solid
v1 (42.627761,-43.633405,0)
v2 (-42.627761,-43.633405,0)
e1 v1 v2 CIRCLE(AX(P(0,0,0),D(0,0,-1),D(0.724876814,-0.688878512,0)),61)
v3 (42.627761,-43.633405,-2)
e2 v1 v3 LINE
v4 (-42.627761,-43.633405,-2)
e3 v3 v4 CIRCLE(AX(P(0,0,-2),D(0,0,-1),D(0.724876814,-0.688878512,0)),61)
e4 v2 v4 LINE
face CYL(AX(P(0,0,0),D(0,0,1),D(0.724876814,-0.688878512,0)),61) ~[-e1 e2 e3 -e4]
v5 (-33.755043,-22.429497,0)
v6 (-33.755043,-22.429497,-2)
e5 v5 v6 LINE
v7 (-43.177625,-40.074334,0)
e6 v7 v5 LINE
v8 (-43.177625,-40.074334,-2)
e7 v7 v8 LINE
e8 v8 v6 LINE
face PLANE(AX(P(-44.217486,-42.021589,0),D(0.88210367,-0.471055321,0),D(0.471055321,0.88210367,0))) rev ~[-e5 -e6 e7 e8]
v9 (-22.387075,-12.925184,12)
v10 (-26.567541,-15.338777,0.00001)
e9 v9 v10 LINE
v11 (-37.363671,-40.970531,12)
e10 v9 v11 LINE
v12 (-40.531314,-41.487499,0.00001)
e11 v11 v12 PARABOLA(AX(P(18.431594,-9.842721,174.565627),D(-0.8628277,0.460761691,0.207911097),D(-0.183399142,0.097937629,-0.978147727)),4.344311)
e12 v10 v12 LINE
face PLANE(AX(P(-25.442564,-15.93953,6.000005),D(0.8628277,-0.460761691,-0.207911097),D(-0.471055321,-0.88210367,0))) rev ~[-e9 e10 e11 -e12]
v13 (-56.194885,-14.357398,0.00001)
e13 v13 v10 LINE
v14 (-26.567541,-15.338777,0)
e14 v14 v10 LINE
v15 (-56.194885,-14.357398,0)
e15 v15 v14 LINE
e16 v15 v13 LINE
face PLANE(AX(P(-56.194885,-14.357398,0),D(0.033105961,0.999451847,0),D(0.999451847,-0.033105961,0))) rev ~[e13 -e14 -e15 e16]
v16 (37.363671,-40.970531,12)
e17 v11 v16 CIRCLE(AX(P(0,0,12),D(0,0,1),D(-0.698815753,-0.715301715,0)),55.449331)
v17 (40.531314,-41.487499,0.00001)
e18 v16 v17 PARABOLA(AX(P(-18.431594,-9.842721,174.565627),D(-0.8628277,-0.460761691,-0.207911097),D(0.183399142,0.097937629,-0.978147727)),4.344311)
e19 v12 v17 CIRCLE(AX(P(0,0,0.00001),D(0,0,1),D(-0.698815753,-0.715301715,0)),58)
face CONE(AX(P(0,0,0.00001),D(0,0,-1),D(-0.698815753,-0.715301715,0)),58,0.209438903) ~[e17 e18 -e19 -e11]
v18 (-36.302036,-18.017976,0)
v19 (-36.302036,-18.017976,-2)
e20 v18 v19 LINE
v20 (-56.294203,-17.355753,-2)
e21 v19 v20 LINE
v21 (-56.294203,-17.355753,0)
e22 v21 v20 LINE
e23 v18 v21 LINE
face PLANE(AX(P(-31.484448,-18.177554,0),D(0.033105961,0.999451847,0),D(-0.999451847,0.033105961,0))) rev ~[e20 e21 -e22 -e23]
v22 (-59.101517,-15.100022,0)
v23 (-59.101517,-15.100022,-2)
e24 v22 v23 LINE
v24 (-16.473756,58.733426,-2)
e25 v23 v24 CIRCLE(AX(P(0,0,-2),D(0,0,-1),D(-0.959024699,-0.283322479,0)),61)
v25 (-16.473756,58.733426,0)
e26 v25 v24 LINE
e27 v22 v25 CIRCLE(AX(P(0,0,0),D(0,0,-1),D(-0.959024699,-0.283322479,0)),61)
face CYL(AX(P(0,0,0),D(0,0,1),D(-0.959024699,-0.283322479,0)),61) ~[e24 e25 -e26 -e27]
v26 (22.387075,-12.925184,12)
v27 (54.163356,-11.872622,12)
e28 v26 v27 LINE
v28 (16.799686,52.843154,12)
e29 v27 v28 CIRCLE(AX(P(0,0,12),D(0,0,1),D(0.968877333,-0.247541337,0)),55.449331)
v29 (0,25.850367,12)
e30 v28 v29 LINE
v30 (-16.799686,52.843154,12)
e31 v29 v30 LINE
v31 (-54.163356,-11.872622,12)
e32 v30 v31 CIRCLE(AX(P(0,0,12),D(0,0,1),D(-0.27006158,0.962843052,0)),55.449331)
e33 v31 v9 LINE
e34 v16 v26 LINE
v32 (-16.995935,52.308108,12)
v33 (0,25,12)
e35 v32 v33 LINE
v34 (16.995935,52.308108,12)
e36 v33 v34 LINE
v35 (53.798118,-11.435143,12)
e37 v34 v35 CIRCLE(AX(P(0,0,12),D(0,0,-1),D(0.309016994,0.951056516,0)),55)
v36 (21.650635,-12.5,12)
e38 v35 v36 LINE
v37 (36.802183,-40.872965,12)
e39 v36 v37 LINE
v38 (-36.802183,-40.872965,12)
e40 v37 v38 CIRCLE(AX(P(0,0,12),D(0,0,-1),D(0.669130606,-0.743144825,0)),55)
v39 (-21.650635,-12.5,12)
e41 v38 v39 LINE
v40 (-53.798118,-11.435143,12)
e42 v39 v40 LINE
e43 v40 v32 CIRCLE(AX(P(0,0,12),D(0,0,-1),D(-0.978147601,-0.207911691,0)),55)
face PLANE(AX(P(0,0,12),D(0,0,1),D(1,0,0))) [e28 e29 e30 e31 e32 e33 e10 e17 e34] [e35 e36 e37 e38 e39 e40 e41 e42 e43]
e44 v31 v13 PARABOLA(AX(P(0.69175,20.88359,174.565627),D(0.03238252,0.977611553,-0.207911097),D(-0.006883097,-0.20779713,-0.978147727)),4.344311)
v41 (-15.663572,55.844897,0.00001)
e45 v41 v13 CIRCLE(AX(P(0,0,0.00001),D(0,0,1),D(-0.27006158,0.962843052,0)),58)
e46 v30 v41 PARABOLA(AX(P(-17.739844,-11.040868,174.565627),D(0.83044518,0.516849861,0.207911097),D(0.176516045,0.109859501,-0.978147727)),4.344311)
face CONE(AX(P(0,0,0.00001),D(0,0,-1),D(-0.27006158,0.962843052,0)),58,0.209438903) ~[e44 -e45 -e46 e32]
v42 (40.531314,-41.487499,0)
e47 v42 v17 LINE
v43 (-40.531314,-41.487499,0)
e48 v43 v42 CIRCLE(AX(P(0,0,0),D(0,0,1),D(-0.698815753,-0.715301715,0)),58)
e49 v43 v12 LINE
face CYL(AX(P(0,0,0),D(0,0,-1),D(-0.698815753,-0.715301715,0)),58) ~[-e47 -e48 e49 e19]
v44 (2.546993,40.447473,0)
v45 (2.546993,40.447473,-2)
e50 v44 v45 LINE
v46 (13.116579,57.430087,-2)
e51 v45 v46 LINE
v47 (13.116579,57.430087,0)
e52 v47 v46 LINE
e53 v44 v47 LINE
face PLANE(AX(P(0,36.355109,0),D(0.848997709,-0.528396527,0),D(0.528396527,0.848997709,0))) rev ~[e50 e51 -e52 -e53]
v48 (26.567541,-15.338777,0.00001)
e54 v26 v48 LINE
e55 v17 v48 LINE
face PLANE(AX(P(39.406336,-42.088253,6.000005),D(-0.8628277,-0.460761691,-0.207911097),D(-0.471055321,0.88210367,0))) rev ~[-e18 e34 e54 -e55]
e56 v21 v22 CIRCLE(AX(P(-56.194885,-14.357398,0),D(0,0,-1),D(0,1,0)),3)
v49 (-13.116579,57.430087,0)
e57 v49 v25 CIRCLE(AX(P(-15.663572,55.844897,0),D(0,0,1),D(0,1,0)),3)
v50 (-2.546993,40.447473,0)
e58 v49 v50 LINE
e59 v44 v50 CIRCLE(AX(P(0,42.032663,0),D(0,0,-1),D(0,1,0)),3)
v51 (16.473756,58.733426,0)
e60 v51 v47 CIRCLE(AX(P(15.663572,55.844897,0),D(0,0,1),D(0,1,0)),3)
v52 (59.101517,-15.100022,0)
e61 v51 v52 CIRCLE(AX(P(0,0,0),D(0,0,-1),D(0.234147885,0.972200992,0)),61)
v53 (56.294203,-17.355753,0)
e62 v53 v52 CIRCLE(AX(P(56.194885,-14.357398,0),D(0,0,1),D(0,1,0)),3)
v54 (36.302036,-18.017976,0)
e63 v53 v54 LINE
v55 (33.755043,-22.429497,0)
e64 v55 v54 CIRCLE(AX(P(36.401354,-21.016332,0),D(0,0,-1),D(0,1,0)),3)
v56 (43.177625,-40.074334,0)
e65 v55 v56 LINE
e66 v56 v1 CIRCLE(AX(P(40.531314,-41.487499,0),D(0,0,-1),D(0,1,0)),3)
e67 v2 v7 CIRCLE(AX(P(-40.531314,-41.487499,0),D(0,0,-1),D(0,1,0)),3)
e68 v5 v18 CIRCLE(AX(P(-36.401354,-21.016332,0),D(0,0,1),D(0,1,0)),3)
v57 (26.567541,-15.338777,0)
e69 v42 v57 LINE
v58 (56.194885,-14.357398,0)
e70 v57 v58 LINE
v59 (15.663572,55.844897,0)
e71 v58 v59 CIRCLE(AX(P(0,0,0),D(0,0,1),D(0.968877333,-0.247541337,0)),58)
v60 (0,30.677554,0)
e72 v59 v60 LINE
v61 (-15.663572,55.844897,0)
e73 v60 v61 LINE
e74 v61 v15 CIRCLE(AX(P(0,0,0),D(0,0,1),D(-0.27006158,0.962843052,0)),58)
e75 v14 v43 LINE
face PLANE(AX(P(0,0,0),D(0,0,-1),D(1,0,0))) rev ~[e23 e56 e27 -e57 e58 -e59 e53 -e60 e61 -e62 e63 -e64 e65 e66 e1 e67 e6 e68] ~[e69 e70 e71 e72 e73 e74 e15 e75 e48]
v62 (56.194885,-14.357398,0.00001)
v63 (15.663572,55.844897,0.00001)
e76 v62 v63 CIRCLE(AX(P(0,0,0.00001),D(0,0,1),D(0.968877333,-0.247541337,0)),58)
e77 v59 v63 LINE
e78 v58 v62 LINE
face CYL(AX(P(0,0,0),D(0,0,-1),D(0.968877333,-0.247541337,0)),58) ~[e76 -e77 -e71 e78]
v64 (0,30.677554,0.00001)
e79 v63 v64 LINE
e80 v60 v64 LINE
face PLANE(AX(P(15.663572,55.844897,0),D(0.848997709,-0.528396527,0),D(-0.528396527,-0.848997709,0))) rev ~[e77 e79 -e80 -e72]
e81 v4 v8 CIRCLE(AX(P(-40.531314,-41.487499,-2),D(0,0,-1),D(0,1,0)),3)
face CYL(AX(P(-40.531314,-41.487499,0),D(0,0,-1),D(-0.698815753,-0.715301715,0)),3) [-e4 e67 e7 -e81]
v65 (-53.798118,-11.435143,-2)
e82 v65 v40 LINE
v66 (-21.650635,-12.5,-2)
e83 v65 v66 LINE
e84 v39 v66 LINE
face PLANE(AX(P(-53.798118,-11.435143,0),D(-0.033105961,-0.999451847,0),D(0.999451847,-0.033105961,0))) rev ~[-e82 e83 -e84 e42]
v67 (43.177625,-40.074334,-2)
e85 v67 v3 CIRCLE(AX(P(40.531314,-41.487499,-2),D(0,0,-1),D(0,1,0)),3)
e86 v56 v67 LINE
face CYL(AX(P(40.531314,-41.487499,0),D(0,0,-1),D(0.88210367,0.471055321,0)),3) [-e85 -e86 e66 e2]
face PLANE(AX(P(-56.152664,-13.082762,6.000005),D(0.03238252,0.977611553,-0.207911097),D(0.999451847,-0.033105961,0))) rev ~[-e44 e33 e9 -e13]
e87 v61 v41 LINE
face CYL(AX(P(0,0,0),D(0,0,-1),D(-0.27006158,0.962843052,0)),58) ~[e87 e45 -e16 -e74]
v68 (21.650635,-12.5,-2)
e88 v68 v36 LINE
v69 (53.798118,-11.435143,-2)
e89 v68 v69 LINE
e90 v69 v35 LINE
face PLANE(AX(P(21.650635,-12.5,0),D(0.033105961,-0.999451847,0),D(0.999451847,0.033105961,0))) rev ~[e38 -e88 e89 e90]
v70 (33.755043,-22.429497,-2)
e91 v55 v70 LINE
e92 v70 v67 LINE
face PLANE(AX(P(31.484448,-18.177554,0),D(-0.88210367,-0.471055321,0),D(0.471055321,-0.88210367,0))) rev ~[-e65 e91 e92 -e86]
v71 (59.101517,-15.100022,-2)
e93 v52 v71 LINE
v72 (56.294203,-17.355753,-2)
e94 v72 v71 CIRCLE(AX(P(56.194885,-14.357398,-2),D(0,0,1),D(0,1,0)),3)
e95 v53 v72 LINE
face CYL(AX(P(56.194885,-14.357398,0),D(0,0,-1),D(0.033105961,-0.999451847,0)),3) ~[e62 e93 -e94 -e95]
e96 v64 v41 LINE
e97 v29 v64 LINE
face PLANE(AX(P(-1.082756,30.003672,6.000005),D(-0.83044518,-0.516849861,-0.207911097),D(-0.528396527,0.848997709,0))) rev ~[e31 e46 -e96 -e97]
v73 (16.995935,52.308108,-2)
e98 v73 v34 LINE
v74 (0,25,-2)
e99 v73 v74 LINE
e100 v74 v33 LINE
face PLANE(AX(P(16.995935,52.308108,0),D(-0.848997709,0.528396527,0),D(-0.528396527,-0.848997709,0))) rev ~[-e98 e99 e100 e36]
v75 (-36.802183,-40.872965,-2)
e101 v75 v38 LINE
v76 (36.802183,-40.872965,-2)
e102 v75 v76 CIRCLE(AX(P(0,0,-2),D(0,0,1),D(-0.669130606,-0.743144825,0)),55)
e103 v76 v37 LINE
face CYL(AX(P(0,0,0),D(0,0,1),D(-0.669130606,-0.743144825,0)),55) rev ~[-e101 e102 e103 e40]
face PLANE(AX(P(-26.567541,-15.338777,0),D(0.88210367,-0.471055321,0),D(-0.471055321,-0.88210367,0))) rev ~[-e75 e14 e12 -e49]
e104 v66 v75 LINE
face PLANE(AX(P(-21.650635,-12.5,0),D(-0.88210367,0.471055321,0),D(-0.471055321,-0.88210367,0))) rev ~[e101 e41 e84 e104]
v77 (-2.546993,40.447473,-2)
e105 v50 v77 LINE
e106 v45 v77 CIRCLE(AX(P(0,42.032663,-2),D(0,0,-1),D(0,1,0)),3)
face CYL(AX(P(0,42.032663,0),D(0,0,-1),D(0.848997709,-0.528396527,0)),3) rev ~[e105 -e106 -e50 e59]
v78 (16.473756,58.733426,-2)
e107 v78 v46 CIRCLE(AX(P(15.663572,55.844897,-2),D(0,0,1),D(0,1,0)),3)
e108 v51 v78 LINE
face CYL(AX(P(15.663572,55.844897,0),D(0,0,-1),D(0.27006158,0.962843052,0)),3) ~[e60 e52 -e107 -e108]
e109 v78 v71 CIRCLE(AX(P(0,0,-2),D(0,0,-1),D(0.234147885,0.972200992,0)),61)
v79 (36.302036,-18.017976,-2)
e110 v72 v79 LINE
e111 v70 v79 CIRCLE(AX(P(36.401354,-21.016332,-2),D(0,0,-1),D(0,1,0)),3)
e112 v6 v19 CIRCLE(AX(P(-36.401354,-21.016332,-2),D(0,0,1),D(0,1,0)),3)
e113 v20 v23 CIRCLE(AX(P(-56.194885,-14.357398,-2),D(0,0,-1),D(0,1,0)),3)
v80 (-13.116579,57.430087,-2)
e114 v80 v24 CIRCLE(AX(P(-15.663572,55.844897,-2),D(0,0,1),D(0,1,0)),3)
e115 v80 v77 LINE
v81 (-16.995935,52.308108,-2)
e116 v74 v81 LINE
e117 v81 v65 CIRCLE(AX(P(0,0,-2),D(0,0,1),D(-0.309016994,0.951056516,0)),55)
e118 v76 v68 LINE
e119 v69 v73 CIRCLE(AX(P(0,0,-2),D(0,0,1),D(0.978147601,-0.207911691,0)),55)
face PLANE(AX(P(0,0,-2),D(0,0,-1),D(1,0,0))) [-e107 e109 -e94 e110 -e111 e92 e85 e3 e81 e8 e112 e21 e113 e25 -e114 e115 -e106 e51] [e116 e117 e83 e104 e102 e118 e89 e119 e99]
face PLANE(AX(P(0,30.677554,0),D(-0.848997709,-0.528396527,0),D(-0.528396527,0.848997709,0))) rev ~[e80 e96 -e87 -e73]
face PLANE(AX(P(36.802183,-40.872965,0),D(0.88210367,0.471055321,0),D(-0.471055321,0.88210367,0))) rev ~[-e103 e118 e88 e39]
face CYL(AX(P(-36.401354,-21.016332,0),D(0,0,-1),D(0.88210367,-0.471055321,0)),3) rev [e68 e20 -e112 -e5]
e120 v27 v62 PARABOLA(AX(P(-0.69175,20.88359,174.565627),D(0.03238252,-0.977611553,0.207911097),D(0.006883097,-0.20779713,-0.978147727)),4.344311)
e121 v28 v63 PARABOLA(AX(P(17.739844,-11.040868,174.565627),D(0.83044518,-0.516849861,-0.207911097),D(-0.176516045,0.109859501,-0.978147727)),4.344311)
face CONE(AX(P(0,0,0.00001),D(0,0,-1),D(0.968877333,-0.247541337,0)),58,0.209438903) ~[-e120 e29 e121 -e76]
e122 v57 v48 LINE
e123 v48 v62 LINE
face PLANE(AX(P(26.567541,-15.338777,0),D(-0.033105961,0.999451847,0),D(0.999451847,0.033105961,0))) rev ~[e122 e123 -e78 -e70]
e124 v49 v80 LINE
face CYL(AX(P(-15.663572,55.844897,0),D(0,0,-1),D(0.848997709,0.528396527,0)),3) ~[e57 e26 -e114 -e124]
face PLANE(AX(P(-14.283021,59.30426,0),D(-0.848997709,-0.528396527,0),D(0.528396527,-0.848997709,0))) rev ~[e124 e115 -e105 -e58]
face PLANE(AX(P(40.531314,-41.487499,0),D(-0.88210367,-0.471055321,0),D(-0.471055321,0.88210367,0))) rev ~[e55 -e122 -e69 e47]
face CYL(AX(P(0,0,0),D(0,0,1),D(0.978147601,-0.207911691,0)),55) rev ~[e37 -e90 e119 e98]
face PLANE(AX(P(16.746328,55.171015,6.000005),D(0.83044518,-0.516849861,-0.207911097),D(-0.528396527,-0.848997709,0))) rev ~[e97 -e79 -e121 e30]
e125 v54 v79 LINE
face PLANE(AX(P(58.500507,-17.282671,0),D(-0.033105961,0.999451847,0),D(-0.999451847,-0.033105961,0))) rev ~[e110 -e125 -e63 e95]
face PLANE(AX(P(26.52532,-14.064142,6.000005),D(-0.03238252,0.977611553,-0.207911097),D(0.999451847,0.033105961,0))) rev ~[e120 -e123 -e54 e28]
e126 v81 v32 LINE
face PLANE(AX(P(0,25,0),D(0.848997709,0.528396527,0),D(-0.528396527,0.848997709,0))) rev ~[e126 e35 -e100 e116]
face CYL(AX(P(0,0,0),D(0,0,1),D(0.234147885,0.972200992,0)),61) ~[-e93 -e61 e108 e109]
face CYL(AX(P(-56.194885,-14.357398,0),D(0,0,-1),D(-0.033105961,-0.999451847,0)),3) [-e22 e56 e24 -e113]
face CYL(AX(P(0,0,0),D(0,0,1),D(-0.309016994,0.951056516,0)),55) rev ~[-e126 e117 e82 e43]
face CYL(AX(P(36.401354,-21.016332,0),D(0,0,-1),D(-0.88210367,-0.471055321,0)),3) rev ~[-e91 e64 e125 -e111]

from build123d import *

# Parameters (mm, degrees)
F1_DEPTH = 12
F3_DEPTH = 2
F4_SIZE2 = 11.99999
F4_SIZE  = 2.550669
F5_R     = 3


# Not quite as in the source:
# - a fillet or chamfer is up to 0.001 mm smaller than in the source, because OpenCascade refuses the exact size


with BuildPart() as f1:
    # F0 (on Top) → F1 (new body)
    with BuildSketch(Plane.XY):
        with BuildLine():
            Line((15.6635716436, 55.8448970217), (0, 30.6775543541))
            Line((0, 30.6775543541), (-15.6635716436, 55.8448970217))
            ThreePointArc((-15.6635716436, 55.8448970217), (-50.2294734195, 29), (-56.1948853143, -14.3573975535))
            Line((-56.1948853143, -14.3573975535), (-26.5675413967, -15.3387771771))
            Line((-26.5675413967, -15.3387771771), (-40.5313136707, -41.4874994682))
            ThreePointArc((-40.5313136707, -41.4874994682), (0, -58), (40.5313136707, -41.4874994682))
            Line((40.5313136707, -41.4874994682), (26.5675413967, -15.3387771771))
            Line((26.5675413967, -15.3387771771), (56.1948853143, -14.3573975535))
            ThreePointArc((56.1948853143, -14.3573975535), (50.2294734195, 29), (15.6635716436, 55.8448970217))
        make_face()
        with BuildLine():
            ThreePointArc((-53.7981180404, -11.435142995), (-47.6313972081, 27.5), (-16.9959346906, 52.3081083962))
            Line((-16.9959346906, 52.3081083962), (0, 25))
            Line((0, 25), (16.9959346906, 52.3081083962))
            ThreePointArc((16.9959346906, 52.3081083962), (47.6313972081, 27.5), (53.7981180404, -11.435142995))
            Line((53.7981180404, -11.435142995), (21.6506350946, -12.5))
            Line((21.6506350946, -12.5), (36.8021833497, -40.8729654013))
            ThreePointArc((36.8021833497, -40.8729654013), (0, -55), (-36.8021833497, -40.8729654013))
            Line((-36.8021833497, -40.8729654013), (-21.6506350946, -12.5))
            Line((-21.6506350946, -12.5), (-53.7981180404, -11.435142995))
        make_face(mode=Mode.SUBTRACT)
    extrude(amount=F1_DEPTH)

    # F2 (on face) → F3 (join)
    with BuildSketch(Plane(origin=(0, 0, 0), x_dir=(1, 0, 0), z_dir=(0, 0, -1))):
        with BuildLine():
            Line((31.4844476987, 18.1775543541), (44.2174856505, 42.0215892459))
            ThreePointArc((44.2174856505, 42.0215892459), (0, 61), (-44.2174856505, 42.0215892459))
            Line((-44.2174856505, 42.0215892459), (-31.4844476987, 18.1775543541))
            Line((-31.4844476987, 18.1775543541), (-58.5005066196, 17.2826712419))
            ThreePointArc((-58.5005066196, 17.2826712419), (-52.8275496309, -30.5), (-14.2830209691, -59.3042604877))
            Line((-14.2830209691, -59.3042604877), (0, -36.3551087083))
            Line((0, -36.3551087083), (14.2830209691, -59.3042604877))
            ThreePointArc((14.2830209691, -59.3042604877), (52.8275496309, -30.5), (58.5005066196, 17.2826712419))
            Line((58.5005066196, 17.2826712419), (31.4844476987, 18.1775543541))
        make_face()
        with BuildLine():
            Line((-21.6506350946, 12.5), (-36.8021833497, 40.8729654013))
            ThreePointArc((-36.8021833497, 40.8729654013), (0, 55), (36.8021833497, 40.8729654013))
            Line((36.8021833497, 40.8729654013), (21.6506350946, 12.5))
            Line((21.6506350946, 12.5), (53.7981180404, 11.435142995))
            ThreePointArc((53.7981180404, 11.435142995), (47.6313972081, -27.5), (16.9959346906, -52.3081083962))
            Line((16.9959346906, -52.3081083962), (0, -25))
            Line((0, -25), (-16.9959346906, -52.3081083962))
            ThreePointArc((-16.9959346906, -52.3081083962), (-47.6313972081, -27.5), (-53.7981180404, 11.435142995))
            Line((-53.7981180404, 11.435142995), (-21.6506350946, 12.5))
        make_face(mode=Mode.SUBTRACT)
    extrude(amount=F3_DEPTH)

    # F4 (size 2.55067874 and 12 in the source; OpenCascade refuses exactly that, so slightly less here)
    f4_edges = [f1.edges().sort_by_distance(p)[0] for p in [
        (-41.381213, -14.848087, 12),
        (-33.549428, -28.413138, 12),
        (0, -58, 12),
        (-50.229473, 29, 12),
        (-7.831786, 43.261226, 12),
        (7.831786, 43.261226, 12),
        (50.229473, 29, 12),
        (41.381213, -14.848087, 12),
        (33.549428, -28.413138, 12),
    ]]
    f4_side = f1.faces().sort_by_distance((0, -56.37468, 12))[0]
    chamfer(f4_edges, length=F4_SIZE, length2=F4_SIZE2, reference=f4_side)

    # F5
    f5_edges = [f1.edges().sort_by_distance(p)[0] for p in [
        (-58.500507, -17.282671, -1),
        (-31.484448, -18.177554, -1),
        (-44.217486, -42.021589, -1),
        (44.217486, -42.021589, -1),
        (31.484448, -18.177554, -1),
        (58.500507, -17.282671, -1),
        (14.283021, 59.30426, -1),
        (0, 36.355109, -1),
        (-14.283021, 59.30426, -1),
    ]]
    fillet(f5_edges, radius=F5_R)


solid = f1.part
